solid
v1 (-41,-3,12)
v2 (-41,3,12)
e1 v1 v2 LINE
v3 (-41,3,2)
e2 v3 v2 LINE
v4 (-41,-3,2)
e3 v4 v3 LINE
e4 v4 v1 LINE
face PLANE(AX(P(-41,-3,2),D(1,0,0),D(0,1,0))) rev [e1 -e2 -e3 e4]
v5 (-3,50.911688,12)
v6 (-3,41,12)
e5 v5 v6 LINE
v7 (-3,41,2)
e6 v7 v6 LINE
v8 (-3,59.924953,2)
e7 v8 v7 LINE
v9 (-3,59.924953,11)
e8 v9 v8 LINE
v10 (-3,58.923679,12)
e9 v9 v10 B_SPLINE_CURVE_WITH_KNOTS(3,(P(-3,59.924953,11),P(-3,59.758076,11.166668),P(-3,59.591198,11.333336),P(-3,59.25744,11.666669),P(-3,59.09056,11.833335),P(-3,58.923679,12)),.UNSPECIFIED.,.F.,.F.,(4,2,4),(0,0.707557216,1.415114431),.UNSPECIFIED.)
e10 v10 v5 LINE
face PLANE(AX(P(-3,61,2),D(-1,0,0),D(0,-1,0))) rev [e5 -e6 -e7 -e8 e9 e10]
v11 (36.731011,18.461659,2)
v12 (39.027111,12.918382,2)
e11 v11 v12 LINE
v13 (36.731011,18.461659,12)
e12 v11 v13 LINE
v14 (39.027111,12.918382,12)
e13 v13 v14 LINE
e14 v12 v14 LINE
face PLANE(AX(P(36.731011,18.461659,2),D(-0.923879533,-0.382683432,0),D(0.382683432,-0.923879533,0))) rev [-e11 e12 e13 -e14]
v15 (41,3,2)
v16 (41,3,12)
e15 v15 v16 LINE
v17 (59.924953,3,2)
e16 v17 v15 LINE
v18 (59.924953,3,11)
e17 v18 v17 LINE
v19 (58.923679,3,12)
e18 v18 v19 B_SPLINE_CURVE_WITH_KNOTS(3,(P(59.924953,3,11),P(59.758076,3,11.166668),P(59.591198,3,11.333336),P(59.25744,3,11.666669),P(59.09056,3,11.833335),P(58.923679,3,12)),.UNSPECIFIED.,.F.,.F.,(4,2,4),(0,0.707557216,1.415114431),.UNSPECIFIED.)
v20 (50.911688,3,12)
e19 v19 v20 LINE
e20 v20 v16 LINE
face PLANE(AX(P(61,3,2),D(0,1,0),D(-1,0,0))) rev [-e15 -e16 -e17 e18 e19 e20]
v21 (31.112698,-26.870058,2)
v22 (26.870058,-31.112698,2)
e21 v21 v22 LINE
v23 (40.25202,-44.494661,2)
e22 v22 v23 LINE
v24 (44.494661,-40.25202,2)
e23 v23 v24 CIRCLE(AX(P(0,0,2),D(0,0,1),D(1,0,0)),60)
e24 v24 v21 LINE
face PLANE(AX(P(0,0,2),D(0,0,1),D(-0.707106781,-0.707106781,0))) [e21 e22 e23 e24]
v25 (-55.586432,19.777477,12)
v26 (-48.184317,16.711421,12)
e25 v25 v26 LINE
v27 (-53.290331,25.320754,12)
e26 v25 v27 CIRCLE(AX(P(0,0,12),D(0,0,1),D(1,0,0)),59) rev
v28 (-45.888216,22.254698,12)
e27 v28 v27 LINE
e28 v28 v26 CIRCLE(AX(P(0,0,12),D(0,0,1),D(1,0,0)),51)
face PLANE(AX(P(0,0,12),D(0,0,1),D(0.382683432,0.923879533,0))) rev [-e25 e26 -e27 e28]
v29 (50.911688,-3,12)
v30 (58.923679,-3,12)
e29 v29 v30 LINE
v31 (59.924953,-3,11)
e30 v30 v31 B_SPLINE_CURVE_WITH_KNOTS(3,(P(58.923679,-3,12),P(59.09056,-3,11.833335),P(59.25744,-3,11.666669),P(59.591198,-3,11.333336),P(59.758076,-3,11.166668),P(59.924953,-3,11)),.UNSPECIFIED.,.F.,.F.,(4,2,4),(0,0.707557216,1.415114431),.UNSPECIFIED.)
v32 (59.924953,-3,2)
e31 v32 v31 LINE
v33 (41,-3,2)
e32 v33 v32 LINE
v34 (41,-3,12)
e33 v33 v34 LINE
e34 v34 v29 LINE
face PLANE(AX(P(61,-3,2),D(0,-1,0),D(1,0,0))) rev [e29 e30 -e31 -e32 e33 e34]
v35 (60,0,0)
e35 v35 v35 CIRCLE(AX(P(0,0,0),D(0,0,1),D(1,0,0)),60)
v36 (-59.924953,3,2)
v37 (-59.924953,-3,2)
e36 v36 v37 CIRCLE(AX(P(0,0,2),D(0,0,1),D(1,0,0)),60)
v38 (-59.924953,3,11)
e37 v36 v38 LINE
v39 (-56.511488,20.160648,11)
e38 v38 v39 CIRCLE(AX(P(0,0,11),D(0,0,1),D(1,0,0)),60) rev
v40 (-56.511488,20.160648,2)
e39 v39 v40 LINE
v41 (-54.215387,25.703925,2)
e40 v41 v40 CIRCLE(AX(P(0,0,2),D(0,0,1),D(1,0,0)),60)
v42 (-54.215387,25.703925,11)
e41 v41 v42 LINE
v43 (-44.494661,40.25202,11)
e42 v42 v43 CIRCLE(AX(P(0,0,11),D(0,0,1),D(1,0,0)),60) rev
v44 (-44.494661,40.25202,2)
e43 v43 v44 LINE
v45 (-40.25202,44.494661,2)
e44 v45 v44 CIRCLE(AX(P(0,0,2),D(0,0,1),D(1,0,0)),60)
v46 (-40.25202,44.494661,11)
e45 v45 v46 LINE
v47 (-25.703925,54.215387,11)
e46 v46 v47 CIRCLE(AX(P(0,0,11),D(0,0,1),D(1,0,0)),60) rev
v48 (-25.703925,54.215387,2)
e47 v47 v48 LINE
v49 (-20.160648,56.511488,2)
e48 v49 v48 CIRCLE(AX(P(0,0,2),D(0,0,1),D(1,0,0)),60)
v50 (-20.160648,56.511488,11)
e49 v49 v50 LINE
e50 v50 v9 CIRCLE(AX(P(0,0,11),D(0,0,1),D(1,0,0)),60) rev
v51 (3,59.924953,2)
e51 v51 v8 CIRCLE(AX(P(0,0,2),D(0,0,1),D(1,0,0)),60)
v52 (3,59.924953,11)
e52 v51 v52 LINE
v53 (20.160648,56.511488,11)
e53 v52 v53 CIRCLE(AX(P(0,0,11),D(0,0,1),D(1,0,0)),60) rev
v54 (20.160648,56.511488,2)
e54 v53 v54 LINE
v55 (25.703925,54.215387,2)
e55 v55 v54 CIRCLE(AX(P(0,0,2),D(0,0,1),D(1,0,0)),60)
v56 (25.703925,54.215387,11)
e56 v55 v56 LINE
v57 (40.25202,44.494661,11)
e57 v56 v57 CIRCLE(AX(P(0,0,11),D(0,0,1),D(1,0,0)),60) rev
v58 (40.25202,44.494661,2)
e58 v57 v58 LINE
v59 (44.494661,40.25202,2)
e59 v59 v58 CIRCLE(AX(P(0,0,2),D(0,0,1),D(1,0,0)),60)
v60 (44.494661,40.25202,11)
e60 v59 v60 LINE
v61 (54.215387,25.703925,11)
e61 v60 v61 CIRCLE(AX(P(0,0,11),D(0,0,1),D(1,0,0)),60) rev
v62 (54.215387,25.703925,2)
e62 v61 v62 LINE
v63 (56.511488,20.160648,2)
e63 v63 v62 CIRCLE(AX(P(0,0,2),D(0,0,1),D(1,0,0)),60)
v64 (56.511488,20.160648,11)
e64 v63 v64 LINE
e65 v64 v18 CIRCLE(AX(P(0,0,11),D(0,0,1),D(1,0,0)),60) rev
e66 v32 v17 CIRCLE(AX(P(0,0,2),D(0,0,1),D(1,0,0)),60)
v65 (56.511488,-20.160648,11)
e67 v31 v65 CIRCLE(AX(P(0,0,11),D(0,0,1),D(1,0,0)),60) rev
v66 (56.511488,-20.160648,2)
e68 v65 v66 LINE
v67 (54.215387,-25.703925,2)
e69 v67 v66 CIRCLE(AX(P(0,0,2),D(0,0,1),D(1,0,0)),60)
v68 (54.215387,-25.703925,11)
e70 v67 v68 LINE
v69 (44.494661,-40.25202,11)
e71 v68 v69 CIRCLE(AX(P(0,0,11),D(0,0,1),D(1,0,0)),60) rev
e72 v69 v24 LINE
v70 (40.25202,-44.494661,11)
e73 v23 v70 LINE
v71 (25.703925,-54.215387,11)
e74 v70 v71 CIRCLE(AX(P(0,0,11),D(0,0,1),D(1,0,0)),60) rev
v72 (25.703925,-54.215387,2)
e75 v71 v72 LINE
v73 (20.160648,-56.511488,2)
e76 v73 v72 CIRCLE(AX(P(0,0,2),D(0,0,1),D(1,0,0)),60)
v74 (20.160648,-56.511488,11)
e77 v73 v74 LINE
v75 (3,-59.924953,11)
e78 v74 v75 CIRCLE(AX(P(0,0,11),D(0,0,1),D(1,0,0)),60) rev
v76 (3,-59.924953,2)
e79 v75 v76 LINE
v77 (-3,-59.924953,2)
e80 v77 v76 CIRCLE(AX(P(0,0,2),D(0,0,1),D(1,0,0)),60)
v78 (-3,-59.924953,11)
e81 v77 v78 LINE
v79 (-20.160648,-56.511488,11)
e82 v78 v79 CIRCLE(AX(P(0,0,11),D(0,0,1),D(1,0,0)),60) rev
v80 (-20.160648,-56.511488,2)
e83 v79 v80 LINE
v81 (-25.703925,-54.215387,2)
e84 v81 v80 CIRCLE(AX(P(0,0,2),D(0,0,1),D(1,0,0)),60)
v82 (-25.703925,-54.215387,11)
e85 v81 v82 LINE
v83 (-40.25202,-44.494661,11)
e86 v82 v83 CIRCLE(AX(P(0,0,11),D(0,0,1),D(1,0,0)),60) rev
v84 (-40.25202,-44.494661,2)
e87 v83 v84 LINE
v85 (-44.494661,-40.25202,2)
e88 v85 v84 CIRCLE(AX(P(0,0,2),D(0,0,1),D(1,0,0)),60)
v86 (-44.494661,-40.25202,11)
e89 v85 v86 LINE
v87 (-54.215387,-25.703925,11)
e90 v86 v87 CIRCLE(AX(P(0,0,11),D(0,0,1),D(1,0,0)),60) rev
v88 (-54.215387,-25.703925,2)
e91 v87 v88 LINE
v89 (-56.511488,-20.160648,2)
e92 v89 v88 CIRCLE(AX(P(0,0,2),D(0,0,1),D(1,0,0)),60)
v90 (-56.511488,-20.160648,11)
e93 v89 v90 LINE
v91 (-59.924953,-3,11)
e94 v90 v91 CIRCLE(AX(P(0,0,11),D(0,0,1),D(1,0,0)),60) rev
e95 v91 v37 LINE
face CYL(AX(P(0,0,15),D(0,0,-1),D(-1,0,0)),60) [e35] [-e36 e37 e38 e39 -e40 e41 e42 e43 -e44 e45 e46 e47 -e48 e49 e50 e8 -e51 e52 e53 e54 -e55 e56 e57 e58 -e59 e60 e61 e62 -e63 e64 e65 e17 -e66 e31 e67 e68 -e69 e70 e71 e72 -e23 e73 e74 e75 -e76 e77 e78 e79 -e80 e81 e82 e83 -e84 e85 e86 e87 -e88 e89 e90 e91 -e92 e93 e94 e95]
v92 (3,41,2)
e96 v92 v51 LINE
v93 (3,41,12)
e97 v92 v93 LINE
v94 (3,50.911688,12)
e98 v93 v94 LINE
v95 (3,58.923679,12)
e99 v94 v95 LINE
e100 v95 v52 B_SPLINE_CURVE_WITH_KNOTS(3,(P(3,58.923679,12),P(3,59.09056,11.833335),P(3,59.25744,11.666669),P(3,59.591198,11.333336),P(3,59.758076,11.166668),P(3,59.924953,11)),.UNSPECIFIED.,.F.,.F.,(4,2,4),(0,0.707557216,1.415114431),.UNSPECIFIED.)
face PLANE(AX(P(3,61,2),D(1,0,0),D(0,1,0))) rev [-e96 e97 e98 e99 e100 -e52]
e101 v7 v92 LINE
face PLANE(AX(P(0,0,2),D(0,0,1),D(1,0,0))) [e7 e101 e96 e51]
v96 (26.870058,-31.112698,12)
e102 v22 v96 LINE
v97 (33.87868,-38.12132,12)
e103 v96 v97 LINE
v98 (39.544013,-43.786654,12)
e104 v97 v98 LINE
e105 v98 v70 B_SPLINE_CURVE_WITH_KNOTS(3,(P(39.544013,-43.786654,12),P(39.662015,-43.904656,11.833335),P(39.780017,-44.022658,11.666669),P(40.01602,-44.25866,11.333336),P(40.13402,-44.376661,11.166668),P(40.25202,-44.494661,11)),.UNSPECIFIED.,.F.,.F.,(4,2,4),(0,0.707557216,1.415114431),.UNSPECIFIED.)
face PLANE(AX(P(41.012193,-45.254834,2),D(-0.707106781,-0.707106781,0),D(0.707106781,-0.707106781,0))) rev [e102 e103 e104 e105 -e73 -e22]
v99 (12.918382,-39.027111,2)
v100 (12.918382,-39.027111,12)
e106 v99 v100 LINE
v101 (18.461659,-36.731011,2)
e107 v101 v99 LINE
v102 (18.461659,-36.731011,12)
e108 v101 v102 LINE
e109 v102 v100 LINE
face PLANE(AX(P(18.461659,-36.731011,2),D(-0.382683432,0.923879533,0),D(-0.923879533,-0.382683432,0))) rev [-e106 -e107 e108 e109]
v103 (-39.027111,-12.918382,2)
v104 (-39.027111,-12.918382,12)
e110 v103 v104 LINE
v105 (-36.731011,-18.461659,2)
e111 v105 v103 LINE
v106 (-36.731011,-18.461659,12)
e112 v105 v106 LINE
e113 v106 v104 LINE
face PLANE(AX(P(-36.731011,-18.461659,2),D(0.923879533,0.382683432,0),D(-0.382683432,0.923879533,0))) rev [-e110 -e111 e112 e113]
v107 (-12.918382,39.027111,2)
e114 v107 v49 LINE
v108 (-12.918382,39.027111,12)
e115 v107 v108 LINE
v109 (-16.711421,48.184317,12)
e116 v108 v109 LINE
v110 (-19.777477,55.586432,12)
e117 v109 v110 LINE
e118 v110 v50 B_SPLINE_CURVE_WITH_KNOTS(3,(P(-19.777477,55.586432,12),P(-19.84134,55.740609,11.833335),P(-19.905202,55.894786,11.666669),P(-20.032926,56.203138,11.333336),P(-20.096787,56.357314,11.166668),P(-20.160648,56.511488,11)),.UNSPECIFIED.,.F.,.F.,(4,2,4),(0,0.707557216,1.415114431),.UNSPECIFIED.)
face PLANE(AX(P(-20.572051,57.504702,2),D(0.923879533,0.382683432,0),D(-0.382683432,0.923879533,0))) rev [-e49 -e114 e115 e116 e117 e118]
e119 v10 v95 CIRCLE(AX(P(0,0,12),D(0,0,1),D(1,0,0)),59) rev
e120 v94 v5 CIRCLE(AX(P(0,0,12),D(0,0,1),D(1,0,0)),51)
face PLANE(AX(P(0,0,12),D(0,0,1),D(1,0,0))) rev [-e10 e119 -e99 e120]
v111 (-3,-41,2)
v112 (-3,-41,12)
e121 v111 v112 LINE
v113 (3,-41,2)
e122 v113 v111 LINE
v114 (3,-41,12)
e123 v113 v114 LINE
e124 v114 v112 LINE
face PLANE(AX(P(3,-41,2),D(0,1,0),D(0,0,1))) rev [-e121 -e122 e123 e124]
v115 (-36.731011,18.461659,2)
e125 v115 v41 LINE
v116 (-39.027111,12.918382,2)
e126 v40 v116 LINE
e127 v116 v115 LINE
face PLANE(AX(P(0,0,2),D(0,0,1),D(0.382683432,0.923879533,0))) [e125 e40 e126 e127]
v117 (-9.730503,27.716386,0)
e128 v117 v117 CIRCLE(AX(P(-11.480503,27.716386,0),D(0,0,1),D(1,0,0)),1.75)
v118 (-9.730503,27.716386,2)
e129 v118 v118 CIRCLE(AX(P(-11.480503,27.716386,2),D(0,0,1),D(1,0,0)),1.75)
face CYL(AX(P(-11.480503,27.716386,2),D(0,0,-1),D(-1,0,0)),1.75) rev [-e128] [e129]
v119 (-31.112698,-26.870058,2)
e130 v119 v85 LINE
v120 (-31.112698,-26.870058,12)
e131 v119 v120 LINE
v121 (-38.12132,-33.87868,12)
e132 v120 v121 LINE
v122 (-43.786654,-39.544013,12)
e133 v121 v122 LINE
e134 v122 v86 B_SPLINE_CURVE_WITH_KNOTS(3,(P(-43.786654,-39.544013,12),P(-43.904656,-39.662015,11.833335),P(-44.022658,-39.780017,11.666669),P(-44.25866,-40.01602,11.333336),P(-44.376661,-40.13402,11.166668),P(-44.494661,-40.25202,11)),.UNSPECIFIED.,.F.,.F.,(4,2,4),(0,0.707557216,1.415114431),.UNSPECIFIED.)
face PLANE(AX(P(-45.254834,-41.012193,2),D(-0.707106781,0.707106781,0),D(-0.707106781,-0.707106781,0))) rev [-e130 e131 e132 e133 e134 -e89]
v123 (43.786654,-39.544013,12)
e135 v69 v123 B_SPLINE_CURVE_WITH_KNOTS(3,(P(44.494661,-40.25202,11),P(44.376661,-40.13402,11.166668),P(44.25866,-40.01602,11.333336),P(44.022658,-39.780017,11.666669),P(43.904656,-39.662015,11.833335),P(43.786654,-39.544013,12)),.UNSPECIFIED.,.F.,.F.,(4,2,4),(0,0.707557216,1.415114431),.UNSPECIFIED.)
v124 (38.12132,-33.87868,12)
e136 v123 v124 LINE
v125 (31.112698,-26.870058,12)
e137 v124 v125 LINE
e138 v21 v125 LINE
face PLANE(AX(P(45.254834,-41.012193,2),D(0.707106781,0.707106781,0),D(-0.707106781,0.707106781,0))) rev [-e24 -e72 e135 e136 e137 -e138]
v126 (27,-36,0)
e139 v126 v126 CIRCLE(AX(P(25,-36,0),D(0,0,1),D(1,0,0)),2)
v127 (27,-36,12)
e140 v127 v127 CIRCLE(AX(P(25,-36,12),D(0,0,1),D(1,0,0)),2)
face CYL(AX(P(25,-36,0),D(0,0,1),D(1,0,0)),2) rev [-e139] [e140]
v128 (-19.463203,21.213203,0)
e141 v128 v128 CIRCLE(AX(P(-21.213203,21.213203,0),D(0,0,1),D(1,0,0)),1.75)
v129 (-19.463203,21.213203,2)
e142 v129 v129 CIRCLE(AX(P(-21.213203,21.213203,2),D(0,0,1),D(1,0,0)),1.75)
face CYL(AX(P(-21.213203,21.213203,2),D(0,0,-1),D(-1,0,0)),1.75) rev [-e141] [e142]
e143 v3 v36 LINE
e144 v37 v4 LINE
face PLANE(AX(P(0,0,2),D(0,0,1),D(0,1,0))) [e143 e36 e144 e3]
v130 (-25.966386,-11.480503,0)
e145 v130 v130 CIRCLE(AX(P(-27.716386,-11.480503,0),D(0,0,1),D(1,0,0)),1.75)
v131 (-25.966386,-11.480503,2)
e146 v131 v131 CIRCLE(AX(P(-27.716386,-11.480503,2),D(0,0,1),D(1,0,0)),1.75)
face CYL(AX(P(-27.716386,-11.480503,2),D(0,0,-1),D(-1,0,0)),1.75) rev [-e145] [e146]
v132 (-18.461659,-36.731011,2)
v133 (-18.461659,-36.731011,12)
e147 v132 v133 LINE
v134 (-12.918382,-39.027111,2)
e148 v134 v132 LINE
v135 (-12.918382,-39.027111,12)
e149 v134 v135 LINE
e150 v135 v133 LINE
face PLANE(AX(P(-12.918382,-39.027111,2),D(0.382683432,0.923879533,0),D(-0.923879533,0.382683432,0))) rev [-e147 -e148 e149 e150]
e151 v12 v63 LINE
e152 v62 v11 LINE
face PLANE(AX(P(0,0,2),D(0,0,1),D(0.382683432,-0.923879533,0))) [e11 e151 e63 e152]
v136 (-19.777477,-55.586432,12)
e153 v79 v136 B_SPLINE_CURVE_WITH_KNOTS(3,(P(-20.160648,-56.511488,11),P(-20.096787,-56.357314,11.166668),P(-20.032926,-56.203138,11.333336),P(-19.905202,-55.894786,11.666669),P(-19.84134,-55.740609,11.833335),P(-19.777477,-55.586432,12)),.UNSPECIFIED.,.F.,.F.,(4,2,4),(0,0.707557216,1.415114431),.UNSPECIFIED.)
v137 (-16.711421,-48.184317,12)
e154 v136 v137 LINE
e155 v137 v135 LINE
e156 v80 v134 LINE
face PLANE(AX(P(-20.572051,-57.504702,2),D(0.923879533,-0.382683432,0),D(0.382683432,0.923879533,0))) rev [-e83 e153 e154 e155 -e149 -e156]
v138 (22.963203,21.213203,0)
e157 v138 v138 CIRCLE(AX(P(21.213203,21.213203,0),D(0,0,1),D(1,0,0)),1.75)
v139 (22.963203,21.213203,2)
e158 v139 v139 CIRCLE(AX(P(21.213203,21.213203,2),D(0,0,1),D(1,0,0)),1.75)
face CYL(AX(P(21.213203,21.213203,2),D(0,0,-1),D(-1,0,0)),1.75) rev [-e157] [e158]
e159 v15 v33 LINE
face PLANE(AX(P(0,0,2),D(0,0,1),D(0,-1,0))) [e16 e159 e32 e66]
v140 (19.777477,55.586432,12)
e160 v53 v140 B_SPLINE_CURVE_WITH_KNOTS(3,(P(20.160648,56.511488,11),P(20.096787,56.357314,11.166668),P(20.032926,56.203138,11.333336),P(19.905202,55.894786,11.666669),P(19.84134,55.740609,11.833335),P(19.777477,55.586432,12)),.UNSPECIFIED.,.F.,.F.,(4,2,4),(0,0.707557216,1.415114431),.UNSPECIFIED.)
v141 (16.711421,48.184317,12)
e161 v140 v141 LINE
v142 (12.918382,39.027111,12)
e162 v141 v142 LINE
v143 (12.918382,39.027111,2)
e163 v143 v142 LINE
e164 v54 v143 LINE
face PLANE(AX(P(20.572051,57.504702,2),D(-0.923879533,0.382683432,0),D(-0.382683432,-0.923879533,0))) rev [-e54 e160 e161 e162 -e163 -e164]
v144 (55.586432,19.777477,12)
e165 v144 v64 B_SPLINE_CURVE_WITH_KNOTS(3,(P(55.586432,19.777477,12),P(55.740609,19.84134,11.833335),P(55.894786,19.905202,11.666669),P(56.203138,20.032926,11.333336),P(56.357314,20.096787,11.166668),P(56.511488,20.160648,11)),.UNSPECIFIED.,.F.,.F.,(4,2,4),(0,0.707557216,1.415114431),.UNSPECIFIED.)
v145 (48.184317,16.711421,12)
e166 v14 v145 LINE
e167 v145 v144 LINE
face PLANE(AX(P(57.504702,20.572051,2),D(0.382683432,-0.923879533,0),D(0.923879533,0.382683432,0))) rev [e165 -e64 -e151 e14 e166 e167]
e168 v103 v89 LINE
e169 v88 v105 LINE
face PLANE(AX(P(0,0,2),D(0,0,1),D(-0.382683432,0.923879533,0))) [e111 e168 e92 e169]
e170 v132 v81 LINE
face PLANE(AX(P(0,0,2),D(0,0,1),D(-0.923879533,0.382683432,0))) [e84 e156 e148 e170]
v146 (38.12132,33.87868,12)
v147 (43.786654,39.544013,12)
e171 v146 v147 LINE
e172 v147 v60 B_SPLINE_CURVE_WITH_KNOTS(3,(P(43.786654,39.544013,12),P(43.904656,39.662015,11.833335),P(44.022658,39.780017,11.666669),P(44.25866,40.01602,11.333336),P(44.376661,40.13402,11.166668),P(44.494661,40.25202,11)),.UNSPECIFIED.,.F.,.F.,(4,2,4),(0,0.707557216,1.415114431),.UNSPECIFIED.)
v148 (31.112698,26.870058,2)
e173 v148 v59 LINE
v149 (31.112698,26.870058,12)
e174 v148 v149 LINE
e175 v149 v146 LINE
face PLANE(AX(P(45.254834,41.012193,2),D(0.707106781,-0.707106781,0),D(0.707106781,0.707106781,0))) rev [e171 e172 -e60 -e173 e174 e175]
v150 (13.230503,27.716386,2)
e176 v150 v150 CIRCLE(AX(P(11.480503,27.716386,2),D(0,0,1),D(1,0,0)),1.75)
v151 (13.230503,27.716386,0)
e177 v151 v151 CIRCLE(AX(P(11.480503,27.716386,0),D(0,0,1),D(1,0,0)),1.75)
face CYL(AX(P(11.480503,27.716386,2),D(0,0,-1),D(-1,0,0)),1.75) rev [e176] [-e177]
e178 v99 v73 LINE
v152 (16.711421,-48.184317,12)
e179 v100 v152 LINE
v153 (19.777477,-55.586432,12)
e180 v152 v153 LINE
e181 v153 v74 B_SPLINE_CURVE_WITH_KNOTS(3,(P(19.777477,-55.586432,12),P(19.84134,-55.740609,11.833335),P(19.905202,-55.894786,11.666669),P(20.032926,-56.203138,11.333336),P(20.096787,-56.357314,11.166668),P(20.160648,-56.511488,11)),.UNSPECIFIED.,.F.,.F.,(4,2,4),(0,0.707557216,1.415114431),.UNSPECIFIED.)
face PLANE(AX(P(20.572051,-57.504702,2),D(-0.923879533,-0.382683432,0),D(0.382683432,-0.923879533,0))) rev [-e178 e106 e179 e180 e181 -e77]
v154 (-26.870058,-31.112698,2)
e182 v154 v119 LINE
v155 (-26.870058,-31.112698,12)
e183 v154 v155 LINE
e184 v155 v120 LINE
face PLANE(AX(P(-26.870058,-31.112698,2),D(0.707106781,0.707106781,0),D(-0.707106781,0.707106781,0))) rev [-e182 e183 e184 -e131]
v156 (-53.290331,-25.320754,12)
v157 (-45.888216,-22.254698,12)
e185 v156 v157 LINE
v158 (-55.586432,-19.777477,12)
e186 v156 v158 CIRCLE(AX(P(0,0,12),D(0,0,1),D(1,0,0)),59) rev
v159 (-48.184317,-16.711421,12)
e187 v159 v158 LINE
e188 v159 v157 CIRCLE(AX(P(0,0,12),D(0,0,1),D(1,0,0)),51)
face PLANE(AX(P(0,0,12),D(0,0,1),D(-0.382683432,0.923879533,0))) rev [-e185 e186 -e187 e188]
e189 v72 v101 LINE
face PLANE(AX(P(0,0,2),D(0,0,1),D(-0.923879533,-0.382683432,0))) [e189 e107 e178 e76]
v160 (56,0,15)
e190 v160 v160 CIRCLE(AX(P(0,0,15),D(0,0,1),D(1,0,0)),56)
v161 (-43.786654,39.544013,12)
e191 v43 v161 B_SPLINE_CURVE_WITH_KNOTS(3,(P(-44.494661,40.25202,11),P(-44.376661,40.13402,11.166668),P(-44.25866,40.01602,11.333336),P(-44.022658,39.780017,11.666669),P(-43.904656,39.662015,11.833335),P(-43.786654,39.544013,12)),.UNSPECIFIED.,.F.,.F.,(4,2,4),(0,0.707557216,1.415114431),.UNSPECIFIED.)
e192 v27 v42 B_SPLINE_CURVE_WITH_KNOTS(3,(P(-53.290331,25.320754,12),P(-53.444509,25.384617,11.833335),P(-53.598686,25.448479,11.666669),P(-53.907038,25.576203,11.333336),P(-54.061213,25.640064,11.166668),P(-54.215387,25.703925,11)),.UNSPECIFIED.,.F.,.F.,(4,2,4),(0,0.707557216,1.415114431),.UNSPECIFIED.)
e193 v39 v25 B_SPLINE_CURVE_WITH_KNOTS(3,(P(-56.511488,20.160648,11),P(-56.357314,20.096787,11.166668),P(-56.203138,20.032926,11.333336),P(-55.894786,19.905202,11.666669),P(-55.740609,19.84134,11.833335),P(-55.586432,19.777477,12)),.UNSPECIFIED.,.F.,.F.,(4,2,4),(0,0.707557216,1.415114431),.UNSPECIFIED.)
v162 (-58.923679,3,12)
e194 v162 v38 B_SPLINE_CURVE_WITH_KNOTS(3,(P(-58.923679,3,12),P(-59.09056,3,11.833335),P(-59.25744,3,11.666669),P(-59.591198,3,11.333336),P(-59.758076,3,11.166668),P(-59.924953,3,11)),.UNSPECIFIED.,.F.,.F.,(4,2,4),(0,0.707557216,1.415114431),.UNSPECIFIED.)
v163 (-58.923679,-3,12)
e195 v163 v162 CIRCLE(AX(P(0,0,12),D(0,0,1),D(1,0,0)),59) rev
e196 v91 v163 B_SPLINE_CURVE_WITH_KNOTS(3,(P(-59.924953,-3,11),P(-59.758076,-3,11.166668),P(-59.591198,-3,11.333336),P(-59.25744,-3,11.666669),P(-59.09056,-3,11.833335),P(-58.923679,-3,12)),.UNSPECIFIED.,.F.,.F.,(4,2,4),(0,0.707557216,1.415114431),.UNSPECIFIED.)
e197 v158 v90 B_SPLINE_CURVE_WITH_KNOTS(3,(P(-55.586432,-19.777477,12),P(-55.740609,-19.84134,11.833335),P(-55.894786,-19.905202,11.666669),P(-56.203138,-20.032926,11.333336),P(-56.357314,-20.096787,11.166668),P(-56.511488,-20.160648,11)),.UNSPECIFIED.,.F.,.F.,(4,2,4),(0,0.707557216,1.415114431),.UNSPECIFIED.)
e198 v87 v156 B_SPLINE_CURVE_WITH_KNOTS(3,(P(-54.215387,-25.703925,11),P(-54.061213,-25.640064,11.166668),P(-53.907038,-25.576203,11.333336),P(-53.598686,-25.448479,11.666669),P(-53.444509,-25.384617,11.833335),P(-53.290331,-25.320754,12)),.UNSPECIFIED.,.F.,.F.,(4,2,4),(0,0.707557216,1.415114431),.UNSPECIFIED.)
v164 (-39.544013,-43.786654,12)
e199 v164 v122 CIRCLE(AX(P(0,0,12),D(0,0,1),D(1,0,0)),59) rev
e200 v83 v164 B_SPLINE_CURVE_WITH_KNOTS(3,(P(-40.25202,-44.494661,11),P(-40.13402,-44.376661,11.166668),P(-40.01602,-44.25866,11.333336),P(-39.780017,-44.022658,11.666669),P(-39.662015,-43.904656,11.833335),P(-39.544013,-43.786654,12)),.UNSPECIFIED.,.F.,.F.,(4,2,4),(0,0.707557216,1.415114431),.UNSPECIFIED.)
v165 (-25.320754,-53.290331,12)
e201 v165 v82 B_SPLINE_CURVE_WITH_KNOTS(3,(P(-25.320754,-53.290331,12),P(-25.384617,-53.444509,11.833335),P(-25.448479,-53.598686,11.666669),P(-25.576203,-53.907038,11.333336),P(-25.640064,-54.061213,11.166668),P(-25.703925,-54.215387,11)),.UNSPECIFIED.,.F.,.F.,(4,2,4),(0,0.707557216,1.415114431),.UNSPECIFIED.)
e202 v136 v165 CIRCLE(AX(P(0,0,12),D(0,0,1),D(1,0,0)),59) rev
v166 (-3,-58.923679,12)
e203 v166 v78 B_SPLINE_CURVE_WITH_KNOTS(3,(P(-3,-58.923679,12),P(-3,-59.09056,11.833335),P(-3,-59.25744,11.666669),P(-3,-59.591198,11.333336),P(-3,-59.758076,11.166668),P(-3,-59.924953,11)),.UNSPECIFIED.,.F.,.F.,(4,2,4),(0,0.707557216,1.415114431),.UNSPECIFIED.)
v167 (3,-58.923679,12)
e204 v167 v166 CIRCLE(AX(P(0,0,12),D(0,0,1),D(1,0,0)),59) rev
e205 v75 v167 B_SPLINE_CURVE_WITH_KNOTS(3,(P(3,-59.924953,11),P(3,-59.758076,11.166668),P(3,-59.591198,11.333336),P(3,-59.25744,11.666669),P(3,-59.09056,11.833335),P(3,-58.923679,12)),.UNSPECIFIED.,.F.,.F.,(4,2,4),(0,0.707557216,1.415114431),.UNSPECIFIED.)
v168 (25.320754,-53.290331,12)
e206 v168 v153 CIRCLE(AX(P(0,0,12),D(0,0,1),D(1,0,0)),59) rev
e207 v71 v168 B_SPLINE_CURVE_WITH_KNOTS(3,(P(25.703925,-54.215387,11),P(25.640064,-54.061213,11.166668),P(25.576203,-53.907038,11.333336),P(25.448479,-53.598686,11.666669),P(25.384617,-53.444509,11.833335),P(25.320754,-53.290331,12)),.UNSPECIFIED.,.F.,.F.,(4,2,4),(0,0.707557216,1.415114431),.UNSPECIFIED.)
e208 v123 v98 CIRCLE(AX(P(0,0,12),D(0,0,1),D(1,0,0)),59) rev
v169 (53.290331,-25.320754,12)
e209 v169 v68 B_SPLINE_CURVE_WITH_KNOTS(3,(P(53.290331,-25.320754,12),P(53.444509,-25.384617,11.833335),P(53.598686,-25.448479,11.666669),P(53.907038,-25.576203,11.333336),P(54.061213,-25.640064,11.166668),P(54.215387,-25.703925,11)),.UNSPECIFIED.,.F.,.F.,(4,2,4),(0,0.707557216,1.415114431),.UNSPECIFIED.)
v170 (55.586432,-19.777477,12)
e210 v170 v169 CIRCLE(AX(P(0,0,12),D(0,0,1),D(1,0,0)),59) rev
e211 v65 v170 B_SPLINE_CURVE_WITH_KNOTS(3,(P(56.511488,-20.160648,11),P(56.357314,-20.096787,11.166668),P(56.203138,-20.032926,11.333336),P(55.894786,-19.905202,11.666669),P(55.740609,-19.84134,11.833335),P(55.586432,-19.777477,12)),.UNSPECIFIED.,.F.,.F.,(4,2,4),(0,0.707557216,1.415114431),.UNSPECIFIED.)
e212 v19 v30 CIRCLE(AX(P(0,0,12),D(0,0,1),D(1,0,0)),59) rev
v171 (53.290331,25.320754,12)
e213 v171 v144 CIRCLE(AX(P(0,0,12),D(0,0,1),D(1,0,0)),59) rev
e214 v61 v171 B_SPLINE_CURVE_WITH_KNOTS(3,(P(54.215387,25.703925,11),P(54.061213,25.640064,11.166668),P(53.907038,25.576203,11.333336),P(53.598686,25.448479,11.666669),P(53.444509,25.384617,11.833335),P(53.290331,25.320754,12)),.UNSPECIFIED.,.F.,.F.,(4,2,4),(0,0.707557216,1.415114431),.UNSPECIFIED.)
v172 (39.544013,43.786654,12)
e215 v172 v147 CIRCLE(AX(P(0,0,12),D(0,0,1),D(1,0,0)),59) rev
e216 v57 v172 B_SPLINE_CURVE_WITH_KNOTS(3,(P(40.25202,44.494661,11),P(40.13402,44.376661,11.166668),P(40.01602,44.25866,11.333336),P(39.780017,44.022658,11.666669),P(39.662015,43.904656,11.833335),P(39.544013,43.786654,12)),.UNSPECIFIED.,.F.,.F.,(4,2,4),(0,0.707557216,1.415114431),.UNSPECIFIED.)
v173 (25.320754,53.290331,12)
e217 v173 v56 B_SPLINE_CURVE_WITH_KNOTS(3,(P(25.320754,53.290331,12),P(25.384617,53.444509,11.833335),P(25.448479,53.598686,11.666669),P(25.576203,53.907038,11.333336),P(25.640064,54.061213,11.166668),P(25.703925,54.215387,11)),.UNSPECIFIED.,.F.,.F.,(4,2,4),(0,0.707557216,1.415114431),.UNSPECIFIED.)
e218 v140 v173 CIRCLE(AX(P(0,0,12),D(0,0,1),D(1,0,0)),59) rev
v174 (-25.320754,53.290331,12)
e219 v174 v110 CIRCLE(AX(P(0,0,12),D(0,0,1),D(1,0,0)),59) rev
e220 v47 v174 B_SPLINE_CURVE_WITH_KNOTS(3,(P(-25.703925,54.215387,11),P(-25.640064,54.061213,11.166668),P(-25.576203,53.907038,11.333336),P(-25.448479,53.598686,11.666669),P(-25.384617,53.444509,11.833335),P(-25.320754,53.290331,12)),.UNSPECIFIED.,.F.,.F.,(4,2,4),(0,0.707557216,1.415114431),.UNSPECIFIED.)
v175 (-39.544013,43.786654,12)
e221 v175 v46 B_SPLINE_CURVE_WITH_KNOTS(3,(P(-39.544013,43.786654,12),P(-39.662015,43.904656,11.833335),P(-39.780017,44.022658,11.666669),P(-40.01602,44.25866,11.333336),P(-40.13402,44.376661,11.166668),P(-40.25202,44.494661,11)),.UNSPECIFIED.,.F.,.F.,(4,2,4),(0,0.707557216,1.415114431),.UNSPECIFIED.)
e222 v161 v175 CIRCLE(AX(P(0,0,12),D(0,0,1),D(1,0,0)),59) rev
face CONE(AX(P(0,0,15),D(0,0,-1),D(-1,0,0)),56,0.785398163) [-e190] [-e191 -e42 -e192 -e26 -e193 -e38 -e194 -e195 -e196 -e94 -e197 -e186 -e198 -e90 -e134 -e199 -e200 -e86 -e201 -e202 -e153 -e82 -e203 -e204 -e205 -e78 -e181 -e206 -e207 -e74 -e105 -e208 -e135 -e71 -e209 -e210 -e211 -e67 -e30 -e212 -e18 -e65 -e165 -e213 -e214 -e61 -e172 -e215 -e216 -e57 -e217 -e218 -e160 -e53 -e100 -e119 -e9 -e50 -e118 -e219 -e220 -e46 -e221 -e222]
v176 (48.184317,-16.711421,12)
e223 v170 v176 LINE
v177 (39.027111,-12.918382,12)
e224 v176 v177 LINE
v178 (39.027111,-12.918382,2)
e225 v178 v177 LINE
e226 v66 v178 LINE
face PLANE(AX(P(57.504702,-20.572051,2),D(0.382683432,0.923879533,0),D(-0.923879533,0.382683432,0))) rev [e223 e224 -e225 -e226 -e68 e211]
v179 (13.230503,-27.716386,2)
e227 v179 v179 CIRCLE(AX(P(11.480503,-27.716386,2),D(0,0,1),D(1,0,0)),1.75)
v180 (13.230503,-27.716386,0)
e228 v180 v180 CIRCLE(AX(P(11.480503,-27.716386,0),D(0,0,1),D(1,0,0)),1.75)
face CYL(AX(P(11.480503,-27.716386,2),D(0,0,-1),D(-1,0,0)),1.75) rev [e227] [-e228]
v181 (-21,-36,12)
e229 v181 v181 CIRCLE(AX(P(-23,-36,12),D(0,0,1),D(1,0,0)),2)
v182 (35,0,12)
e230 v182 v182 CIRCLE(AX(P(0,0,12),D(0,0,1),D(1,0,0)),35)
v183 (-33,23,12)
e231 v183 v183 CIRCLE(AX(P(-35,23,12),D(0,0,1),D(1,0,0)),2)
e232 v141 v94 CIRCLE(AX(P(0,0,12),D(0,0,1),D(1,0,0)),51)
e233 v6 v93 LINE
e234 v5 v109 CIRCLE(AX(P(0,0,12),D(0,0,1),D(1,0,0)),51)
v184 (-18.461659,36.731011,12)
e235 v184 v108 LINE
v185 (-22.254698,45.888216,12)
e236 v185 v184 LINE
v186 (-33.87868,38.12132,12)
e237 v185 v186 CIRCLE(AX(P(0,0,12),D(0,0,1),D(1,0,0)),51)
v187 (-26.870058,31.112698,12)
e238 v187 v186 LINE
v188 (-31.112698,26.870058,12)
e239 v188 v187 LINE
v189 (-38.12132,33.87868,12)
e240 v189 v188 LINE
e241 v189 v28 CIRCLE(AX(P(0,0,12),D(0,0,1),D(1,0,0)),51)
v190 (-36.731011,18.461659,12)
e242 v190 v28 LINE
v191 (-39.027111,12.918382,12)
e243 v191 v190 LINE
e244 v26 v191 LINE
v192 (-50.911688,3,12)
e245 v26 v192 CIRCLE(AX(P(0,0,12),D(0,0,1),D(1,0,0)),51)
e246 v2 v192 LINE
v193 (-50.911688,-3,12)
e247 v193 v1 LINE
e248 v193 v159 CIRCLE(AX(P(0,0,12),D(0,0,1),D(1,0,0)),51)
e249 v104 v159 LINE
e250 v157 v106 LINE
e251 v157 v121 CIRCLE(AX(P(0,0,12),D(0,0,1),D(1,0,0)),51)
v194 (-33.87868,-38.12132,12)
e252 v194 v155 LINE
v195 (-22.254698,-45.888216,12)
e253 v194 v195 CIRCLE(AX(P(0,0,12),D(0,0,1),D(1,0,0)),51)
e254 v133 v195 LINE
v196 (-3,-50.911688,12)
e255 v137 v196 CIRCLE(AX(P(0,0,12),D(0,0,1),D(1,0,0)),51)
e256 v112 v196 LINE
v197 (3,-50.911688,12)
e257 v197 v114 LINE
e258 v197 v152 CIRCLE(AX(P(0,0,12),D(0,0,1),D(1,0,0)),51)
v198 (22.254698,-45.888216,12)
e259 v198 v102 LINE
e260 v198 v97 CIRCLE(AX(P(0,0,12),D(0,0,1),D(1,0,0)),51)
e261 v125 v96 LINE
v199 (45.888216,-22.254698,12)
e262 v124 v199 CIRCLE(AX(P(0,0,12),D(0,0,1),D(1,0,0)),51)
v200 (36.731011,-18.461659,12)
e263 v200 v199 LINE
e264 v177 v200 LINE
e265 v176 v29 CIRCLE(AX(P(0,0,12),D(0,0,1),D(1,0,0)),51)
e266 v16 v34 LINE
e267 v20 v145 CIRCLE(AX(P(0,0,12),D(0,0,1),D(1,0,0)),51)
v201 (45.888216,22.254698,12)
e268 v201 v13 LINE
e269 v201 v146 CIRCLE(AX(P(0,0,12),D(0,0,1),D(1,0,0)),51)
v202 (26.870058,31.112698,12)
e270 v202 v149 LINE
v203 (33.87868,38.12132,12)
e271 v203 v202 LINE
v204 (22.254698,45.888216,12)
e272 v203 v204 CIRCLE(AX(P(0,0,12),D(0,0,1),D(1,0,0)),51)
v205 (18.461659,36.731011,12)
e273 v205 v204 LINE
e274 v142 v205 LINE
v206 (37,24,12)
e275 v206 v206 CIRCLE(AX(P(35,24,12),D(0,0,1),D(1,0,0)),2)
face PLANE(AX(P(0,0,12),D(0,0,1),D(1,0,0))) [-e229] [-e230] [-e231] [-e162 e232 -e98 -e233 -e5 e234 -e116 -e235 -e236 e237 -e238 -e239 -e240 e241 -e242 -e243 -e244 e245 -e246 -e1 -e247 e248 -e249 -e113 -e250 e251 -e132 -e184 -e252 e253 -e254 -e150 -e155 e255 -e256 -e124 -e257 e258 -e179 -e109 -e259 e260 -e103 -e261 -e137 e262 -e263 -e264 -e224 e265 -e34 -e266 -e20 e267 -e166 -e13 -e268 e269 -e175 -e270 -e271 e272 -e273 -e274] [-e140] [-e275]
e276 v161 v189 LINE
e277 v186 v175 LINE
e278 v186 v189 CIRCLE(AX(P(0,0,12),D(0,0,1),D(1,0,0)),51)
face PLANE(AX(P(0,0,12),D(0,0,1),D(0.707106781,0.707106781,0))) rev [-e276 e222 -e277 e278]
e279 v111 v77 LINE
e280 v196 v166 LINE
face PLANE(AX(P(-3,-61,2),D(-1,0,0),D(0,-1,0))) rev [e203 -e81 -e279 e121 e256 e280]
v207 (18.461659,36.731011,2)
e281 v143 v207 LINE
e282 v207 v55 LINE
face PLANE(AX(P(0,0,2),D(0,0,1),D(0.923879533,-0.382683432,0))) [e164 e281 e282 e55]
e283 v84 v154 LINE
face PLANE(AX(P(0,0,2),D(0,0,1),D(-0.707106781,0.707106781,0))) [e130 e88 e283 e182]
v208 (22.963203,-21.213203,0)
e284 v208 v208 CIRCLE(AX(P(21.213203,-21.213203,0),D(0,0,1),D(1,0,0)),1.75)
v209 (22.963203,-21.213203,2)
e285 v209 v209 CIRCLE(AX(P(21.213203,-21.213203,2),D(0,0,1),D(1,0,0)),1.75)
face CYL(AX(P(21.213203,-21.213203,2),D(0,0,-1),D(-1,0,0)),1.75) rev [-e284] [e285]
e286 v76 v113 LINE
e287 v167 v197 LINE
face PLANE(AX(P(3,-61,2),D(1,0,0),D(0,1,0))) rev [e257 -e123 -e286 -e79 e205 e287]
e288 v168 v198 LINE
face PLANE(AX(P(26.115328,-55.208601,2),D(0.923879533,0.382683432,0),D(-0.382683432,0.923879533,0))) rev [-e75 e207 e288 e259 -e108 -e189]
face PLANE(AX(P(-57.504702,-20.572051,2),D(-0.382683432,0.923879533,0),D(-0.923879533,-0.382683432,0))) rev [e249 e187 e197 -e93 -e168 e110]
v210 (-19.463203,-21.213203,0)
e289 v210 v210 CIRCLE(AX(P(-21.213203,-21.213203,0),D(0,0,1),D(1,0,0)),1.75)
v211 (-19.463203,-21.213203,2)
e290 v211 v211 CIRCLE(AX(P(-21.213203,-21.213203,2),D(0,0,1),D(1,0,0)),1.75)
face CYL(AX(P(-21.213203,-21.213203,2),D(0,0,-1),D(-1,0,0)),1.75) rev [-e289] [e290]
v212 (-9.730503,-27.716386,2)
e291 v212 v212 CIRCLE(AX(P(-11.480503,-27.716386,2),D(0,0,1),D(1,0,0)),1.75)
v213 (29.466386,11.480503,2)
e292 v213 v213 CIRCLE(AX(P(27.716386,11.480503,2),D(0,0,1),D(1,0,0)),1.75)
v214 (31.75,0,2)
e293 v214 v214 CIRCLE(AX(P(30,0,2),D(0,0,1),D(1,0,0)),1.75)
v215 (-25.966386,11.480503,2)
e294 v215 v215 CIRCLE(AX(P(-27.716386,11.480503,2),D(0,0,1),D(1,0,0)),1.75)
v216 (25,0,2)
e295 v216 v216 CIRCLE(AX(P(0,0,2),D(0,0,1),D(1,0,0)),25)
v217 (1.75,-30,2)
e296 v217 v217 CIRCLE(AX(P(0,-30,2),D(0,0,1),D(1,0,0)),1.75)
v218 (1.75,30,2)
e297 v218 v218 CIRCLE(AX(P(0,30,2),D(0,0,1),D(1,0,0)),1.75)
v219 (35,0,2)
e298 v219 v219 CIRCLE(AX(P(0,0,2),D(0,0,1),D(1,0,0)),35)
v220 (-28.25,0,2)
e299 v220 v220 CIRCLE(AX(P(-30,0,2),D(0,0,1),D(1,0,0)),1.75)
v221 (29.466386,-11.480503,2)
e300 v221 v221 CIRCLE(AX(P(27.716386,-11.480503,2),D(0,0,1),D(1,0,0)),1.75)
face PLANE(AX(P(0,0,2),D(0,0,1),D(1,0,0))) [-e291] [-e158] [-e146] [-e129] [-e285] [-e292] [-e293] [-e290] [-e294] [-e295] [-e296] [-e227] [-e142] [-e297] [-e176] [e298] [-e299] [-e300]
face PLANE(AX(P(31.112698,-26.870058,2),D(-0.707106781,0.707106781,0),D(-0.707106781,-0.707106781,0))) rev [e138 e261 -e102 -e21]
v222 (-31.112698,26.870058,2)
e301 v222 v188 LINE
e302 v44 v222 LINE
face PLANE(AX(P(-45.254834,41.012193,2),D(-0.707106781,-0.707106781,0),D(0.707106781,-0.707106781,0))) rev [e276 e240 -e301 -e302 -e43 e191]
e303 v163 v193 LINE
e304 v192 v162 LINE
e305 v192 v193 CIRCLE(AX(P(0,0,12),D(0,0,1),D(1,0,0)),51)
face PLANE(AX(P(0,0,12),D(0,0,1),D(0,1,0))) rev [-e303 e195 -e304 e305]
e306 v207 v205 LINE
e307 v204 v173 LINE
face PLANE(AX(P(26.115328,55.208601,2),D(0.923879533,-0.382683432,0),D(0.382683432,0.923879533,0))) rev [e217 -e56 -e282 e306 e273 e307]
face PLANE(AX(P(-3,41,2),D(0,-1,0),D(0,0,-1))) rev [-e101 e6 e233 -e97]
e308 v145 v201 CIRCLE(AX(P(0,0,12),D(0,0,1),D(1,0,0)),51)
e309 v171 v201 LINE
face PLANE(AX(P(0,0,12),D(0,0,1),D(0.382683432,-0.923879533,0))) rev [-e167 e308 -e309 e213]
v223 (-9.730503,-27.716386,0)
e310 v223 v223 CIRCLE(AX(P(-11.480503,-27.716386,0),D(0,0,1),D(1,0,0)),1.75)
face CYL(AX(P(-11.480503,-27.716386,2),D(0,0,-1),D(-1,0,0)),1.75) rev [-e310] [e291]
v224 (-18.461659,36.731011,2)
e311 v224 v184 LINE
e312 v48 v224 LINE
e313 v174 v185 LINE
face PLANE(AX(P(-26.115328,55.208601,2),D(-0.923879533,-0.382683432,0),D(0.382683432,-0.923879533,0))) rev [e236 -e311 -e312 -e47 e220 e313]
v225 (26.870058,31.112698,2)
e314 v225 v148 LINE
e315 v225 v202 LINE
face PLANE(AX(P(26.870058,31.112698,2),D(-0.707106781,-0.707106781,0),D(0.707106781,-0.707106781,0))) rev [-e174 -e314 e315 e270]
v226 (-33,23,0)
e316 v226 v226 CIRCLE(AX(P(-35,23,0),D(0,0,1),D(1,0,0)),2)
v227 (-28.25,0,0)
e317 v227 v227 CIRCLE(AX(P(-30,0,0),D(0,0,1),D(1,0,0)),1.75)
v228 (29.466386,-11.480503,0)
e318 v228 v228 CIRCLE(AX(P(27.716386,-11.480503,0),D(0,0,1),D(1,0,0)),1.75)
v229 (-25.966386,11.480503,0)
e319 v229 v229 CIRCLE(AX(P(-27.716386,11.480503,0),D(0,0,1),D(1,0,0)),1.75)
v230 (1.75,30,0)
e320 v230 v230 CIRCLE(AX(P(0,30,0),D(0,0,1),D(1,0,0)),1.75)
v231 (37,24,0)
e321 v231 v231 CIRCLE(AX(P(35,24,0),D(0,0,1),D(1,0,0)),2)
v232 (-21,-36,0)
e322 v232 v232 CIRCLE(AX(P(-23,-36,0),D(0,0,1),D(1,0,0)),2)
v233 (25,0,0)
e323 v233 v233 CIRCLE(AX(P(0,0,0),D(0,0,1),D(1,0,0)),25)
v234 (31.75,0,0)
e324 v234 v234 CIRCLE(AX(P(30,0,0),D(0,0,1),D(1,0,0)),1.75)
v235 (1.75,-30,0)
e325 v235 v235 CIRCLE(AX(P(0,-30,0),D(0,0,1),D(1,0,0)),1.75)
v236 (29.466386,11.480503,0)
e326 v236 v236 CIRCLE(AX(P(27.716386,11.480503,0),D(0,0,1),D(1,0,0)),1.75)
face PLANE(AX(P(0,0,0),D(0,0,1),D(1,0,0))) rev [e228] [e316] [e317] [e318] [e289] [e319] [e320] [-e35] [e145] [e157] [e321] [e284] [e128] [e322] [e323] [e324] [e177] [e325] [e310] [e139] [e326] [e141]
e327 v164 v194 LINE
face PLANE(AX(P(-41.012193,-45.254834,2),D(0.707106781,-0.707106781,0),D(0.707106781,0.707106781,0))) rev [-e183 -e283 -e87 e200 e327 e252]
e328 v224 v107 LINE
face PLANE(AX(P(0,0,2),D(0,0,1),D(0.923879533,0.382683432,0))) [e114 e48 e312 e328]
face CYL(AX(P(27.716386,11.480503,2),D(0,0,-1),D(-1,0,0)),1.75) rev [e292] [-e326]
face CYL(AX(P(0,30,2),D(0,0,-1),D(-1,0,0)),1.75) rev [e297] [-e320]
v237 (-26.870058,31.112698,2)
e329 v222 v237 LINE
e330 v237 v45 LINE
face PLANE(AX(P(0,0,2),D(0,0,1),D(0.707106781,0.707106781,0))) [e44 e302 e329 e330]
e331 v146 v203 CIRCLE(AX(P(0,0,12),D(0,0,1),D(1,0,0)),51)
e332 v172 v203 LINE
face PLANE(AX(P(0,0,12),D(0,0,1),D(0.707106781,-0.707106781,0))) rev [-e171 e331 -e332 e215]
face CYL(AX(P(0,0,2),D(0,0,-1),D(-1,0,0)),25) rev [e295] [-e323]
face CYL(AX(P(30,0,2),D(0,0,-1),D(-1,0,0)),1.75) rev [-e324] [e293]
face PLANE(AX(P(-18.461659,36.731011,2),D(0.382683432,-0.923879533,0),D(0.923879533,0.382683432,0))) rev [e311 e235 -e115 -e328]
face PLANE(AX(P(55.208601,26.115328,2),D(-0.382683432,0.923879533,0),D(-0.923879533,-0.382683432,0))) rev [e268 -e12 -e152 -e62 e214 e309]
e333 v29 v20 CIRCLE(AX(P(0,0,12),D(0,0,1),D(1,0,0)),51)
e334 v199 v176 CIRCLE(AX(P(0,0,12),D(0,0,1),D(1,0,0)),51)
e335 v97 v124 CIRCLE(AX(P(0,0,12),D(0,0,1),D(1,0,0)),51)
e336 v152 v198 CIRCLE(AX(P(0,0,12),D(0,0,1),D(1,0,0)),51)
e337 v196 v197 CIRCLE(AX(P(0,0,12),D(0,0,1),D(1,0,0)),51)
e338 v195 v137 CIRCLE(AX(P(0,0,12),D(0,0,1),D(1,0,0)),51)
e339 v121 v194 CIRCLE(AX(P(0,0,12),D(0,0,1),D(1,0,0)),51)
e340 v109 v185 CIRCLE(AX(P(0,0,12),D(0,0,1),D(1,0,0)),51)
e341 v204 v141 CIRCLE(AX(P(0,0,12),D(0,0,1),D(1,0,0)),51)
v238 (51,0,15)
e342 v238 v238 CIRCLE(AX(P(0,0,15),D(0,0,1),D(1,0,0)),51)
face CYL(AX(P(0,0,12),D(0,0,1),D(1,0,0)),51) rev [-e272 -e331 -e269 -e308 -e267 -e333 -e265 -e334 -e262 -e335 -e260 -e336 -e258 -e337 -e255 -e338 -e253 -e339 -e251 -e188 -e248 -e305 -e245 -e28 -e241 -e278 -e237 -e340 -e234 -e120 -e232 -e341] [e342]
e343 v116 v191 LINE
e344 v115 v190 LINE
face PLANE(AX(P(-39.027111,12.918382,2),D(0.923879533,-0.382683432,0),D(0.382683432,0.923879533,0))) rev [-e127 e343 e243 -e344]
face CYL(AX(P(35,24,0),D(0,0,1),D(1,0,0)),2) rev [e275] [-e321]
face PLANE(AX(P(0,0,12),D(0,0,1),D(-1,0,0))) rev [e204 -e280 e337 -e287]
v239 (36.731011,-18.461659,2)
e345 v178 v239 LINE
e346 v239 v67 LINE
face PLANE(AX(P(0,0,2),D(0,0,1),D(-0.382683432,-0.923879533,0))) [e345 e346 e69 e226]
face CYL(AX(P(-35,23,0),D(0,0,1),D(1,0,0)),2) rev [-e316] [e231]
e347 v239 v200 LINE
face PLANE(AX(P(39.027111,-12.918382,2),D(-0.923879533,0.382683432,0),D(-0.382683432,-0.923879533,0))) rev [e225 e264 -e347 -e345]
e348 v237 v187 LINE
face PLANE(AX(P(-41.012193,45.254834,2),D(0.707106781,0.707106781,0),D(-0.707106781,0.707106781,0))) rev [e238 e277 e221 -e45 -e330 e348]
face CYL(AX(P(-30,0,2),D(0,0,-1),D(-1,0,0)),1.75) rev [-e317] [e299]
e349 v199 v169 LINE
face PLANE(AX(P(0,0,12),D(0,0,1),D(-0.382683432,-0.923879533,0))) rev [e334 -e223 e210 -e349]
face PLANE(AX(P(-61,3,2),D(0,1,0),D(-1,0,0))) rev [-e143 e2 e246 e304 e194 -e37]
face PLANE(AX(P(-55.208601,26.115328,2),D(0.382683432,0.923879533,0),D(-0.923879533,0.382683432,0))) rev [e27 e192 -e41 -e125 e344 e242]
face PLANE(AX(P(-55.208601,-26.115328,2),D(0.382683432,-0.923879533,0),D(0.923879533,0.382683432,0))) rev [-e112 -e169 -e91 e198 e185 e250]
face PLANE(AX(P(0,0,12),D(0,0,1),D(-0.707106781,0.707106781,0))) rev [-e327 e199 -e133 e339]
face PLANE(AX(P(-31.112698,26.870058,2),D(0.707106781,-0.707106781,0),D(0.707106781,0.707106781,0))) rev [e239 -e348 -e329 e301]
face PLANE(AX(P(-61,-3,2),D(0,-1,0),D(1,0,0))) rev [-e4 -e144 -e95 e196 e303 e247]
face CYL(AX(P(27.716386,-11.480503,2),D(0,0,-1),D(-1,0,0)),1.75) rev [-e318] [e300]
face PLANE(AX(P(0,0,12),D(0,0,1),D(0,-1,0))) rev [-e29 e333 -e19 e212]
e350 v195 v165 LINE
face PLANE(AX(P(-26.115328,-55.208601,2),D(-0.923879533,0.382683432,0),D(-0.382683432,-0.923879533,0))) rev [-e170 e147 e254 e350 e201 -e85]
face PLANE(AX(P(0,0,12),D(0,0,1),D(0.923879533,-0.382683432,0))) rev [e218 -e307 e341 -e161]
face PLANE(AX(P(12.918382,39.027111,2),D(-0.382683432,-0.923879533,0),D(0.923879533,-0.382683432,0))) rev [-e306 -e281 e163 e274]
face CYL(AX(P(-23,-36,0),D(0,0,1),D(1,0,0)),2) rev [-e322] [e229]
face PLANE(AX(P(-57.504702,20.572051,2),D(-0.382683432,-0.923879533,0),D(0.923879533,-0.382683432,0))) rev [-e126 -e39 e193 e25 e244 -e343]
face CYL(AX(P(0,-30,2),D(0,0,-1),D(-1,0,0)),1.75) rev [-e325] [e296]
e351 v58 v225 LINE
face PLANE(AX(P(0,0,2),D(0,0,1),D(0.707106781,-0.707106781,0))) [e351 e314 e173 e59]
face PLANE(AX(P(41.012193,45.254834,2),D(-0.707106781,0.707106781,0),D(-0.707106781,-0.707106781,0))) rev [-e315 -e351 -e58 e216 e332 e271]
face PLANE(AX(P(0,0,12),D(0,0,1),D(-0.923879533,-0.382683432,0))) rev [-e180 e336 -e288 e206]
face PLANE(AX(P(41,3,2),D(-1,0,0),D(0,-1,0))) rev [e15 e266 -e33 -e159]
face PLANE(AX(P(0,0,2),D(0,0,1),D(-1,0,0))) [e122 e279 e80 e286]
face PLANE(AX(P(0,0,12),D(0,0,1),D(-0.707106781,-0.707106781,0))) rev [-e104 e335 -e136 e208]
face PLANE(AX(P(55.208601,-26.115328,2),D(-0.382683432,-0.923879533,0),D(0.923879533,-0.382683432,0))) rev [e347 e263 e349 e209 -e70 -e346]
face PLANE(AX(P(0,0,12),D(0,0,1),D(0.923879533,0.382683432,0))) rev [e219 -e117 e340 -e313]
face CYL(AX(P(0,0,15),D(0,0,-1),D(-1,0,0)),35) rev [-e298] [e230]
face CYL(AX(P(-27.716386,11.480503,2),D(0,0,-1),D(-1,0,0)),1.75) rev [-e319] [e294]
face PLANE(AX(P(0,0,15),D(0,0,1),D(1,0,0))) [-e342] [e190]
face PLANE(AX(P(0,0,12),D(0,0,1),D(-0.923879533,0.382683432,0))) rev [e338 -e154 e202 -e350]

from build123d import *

# Parameters (mm, degrees)
SKETCH2_R           = 60
SKETCH2_R_2         = 35
BOSS_EXTRUDE1_DEPTH = 15
SKETCH3_R           = 51
CUT_EXTRUDE1_DEPTH  = 3
SKETCH4_W           = 6
SKETCH4_H           = 20
CUT_EXTRUDE2_DEPTH  = 10
CIRPATTERN1_COUNT   = 16
CHAMFER1_SIZE       = 4
SKETCH5_R           = 2
CUT_EXTRUDE3_DEPTH  = 86.697141143
SKETCH6_R           = 35
SKETCH6_R_2         = 1.75
SKETCH6_R_3         = 25
BOSS_EXTRUDE2_DEPTH = 2


with BuildPart() as part:
    # Sketch2 → Boss-Extrude1 (new body)
    with BuildSketch(Plane.XY):
        Circle(SKETCH2_R)
        Circle(SKETCH2_R_2, mode=Mode.SUBTRACT)
    extrude(amount=BOSS_EXTRUDE1_DEPTH)

    # Sketch3 → Cut-Extrude1 (cut)
    with BuildSketch(Plane.XY.offset(15)):
        Circle(SKETCH3_R)
    extrude(amount=-CUT_EXTRUDE1_DEPTH, mode=Mode.SUBTRACT)

    # Sketch4 → Cut-Extrude2 (cut)
    with BuildSketch(Plane.XY.offset(12)):
        with Locations((0, 51)):
            Rectangle(SKETCH4_W, SKETCH4_H)
    cut_extrude2 = extrude(amount=-CUT_EXTRUDE2_DEPTH, mode=Mode.SUBTRACT)

    # CirPattern1: Cut-Extrude2 ×16 about axis
    cirpattern1_axis = Axis((0, 0, 0), (0, 0, 1))
    for i in range(1, CIRPATTERN1_COUNT):
        add(cut_extrude2.rotate(cirpattern1_axis, i * 360 / CIRPATTERN1_COUNT), mode=Mode.SUBTRACT)

    # Chamfer1
    # the kernel refuses this chamfer: 4 mm, written as the material it takes off along each edge
    with BuildSketch(Plane(origin=(0, 0, 15), x_dir=(1, 0, 0), z_dir=(0, -1, 0))) as chamfer1_piece_1:
        Polygon((60, -CHAMFER1_SIZE), (60 - CHAMFER1_SIZE, 0), (60, 0), align=None)
    revolve(axis=Axis((0, 0, 15), (0, 0, 1)), mode=Mode.SUBTRACT)

    # Sketch5 → Cut-Extrude3 (cut, through all)
    with BuildSketch(Plane.XY.offset(12)):
        with Locations((25, -36)):
            Circle(SKETCH5_R)
        with Locations((-23, -36)):
            Circle(SKETCH5_R)
        with Locations((35, 24)):
            Circle(SKETCH5_R)
        with Locations((-35, 23)):
            Circle(SKETCH5_R)
    extrude(amount=-CUT_EXTRUDE3_DEPTH, mode=Mode.SUBTRACT)

    # Sketch6 → Boss-Extrude2 (add)
    with BuildSketch(Plane.XY):
        Circle(SKETCH6_R)
        with Locations((-30, 0)):
            Circle(SKETCH6_R_2, mode=Mode.SUBTRACT)
        Circle(SKETCH6_R_3, mode=Mode.SUBTRACT)
        with Locations((-27.716385975, 11.480502971)):
            Circle(SKETCH6_R_2, mode=Mode.SUBTRACT)
        with Locations((-21.213203436, 21.213203436)):
            Circle(SKETCH6_R_2, mode=Mode.SUBTRACT)
        with Locations((-11.480502971, 27.716385975)):
            Circle(SKETCH6_R_2, mode=Mode.SUBTRACT)
        with Locations((0, 30)):
            Circle(SKETCH6_R_2, mode=Mode.SUBTRACT)
        with Locations((11.480502971, 27.716385975)):
            Circle(SKETCH6_R_2, mode=Mode.SUBTRACT)
        with Locations((21.213203436, 21.213203436)):
            Circle(SKETCH6_R_2, mode=Mode.SUBTRACT)
        with Locations((27.716385975, 11.480502971)):
            Circle(SKETCH6_R_2, mode=Mode.SUBTRACT)
        with Locations((30, 0)):
            Circle(SKETCH6_R_2, mode=Mode.SUBTRACT)
        with Locations((27.716385975, -11.480502971)):
            Circle(SKETCH6_R_2, mode=Mode.SUBTRACT)
        with Locations((21.213203436, -21.213203436)):
            Circle(SKETCH6_R_2, mode=Mode.SUBTRACT)
        with Locations((11.480502971, -27.716385975)):
            Circle(SKETCH6_R_2, mode=Mode.SUBTRACT)
        with Locations((0, -30)):
            Circle(SKETCH6_R_2, mode=Mode.SUBTRACT)
        with Locations((-11.480502971, -27.716385975)):
            Circle(SKETCH6_R_2, mode=Mode.SUBTRACT)
        with Locations((-21.213203436, -21.213203436)):
            Circle(SKETCH6_R_2, mode=Mode.SUBTRACT)
        with Locations((-27.716385975, -11.480502971)):
            Circle(SKETCH6_R_2, mode=Mode.SUBTRACT)
    extrude(amount=BOSS_EXTRUDE2_DEPTH)


solid = part.part
